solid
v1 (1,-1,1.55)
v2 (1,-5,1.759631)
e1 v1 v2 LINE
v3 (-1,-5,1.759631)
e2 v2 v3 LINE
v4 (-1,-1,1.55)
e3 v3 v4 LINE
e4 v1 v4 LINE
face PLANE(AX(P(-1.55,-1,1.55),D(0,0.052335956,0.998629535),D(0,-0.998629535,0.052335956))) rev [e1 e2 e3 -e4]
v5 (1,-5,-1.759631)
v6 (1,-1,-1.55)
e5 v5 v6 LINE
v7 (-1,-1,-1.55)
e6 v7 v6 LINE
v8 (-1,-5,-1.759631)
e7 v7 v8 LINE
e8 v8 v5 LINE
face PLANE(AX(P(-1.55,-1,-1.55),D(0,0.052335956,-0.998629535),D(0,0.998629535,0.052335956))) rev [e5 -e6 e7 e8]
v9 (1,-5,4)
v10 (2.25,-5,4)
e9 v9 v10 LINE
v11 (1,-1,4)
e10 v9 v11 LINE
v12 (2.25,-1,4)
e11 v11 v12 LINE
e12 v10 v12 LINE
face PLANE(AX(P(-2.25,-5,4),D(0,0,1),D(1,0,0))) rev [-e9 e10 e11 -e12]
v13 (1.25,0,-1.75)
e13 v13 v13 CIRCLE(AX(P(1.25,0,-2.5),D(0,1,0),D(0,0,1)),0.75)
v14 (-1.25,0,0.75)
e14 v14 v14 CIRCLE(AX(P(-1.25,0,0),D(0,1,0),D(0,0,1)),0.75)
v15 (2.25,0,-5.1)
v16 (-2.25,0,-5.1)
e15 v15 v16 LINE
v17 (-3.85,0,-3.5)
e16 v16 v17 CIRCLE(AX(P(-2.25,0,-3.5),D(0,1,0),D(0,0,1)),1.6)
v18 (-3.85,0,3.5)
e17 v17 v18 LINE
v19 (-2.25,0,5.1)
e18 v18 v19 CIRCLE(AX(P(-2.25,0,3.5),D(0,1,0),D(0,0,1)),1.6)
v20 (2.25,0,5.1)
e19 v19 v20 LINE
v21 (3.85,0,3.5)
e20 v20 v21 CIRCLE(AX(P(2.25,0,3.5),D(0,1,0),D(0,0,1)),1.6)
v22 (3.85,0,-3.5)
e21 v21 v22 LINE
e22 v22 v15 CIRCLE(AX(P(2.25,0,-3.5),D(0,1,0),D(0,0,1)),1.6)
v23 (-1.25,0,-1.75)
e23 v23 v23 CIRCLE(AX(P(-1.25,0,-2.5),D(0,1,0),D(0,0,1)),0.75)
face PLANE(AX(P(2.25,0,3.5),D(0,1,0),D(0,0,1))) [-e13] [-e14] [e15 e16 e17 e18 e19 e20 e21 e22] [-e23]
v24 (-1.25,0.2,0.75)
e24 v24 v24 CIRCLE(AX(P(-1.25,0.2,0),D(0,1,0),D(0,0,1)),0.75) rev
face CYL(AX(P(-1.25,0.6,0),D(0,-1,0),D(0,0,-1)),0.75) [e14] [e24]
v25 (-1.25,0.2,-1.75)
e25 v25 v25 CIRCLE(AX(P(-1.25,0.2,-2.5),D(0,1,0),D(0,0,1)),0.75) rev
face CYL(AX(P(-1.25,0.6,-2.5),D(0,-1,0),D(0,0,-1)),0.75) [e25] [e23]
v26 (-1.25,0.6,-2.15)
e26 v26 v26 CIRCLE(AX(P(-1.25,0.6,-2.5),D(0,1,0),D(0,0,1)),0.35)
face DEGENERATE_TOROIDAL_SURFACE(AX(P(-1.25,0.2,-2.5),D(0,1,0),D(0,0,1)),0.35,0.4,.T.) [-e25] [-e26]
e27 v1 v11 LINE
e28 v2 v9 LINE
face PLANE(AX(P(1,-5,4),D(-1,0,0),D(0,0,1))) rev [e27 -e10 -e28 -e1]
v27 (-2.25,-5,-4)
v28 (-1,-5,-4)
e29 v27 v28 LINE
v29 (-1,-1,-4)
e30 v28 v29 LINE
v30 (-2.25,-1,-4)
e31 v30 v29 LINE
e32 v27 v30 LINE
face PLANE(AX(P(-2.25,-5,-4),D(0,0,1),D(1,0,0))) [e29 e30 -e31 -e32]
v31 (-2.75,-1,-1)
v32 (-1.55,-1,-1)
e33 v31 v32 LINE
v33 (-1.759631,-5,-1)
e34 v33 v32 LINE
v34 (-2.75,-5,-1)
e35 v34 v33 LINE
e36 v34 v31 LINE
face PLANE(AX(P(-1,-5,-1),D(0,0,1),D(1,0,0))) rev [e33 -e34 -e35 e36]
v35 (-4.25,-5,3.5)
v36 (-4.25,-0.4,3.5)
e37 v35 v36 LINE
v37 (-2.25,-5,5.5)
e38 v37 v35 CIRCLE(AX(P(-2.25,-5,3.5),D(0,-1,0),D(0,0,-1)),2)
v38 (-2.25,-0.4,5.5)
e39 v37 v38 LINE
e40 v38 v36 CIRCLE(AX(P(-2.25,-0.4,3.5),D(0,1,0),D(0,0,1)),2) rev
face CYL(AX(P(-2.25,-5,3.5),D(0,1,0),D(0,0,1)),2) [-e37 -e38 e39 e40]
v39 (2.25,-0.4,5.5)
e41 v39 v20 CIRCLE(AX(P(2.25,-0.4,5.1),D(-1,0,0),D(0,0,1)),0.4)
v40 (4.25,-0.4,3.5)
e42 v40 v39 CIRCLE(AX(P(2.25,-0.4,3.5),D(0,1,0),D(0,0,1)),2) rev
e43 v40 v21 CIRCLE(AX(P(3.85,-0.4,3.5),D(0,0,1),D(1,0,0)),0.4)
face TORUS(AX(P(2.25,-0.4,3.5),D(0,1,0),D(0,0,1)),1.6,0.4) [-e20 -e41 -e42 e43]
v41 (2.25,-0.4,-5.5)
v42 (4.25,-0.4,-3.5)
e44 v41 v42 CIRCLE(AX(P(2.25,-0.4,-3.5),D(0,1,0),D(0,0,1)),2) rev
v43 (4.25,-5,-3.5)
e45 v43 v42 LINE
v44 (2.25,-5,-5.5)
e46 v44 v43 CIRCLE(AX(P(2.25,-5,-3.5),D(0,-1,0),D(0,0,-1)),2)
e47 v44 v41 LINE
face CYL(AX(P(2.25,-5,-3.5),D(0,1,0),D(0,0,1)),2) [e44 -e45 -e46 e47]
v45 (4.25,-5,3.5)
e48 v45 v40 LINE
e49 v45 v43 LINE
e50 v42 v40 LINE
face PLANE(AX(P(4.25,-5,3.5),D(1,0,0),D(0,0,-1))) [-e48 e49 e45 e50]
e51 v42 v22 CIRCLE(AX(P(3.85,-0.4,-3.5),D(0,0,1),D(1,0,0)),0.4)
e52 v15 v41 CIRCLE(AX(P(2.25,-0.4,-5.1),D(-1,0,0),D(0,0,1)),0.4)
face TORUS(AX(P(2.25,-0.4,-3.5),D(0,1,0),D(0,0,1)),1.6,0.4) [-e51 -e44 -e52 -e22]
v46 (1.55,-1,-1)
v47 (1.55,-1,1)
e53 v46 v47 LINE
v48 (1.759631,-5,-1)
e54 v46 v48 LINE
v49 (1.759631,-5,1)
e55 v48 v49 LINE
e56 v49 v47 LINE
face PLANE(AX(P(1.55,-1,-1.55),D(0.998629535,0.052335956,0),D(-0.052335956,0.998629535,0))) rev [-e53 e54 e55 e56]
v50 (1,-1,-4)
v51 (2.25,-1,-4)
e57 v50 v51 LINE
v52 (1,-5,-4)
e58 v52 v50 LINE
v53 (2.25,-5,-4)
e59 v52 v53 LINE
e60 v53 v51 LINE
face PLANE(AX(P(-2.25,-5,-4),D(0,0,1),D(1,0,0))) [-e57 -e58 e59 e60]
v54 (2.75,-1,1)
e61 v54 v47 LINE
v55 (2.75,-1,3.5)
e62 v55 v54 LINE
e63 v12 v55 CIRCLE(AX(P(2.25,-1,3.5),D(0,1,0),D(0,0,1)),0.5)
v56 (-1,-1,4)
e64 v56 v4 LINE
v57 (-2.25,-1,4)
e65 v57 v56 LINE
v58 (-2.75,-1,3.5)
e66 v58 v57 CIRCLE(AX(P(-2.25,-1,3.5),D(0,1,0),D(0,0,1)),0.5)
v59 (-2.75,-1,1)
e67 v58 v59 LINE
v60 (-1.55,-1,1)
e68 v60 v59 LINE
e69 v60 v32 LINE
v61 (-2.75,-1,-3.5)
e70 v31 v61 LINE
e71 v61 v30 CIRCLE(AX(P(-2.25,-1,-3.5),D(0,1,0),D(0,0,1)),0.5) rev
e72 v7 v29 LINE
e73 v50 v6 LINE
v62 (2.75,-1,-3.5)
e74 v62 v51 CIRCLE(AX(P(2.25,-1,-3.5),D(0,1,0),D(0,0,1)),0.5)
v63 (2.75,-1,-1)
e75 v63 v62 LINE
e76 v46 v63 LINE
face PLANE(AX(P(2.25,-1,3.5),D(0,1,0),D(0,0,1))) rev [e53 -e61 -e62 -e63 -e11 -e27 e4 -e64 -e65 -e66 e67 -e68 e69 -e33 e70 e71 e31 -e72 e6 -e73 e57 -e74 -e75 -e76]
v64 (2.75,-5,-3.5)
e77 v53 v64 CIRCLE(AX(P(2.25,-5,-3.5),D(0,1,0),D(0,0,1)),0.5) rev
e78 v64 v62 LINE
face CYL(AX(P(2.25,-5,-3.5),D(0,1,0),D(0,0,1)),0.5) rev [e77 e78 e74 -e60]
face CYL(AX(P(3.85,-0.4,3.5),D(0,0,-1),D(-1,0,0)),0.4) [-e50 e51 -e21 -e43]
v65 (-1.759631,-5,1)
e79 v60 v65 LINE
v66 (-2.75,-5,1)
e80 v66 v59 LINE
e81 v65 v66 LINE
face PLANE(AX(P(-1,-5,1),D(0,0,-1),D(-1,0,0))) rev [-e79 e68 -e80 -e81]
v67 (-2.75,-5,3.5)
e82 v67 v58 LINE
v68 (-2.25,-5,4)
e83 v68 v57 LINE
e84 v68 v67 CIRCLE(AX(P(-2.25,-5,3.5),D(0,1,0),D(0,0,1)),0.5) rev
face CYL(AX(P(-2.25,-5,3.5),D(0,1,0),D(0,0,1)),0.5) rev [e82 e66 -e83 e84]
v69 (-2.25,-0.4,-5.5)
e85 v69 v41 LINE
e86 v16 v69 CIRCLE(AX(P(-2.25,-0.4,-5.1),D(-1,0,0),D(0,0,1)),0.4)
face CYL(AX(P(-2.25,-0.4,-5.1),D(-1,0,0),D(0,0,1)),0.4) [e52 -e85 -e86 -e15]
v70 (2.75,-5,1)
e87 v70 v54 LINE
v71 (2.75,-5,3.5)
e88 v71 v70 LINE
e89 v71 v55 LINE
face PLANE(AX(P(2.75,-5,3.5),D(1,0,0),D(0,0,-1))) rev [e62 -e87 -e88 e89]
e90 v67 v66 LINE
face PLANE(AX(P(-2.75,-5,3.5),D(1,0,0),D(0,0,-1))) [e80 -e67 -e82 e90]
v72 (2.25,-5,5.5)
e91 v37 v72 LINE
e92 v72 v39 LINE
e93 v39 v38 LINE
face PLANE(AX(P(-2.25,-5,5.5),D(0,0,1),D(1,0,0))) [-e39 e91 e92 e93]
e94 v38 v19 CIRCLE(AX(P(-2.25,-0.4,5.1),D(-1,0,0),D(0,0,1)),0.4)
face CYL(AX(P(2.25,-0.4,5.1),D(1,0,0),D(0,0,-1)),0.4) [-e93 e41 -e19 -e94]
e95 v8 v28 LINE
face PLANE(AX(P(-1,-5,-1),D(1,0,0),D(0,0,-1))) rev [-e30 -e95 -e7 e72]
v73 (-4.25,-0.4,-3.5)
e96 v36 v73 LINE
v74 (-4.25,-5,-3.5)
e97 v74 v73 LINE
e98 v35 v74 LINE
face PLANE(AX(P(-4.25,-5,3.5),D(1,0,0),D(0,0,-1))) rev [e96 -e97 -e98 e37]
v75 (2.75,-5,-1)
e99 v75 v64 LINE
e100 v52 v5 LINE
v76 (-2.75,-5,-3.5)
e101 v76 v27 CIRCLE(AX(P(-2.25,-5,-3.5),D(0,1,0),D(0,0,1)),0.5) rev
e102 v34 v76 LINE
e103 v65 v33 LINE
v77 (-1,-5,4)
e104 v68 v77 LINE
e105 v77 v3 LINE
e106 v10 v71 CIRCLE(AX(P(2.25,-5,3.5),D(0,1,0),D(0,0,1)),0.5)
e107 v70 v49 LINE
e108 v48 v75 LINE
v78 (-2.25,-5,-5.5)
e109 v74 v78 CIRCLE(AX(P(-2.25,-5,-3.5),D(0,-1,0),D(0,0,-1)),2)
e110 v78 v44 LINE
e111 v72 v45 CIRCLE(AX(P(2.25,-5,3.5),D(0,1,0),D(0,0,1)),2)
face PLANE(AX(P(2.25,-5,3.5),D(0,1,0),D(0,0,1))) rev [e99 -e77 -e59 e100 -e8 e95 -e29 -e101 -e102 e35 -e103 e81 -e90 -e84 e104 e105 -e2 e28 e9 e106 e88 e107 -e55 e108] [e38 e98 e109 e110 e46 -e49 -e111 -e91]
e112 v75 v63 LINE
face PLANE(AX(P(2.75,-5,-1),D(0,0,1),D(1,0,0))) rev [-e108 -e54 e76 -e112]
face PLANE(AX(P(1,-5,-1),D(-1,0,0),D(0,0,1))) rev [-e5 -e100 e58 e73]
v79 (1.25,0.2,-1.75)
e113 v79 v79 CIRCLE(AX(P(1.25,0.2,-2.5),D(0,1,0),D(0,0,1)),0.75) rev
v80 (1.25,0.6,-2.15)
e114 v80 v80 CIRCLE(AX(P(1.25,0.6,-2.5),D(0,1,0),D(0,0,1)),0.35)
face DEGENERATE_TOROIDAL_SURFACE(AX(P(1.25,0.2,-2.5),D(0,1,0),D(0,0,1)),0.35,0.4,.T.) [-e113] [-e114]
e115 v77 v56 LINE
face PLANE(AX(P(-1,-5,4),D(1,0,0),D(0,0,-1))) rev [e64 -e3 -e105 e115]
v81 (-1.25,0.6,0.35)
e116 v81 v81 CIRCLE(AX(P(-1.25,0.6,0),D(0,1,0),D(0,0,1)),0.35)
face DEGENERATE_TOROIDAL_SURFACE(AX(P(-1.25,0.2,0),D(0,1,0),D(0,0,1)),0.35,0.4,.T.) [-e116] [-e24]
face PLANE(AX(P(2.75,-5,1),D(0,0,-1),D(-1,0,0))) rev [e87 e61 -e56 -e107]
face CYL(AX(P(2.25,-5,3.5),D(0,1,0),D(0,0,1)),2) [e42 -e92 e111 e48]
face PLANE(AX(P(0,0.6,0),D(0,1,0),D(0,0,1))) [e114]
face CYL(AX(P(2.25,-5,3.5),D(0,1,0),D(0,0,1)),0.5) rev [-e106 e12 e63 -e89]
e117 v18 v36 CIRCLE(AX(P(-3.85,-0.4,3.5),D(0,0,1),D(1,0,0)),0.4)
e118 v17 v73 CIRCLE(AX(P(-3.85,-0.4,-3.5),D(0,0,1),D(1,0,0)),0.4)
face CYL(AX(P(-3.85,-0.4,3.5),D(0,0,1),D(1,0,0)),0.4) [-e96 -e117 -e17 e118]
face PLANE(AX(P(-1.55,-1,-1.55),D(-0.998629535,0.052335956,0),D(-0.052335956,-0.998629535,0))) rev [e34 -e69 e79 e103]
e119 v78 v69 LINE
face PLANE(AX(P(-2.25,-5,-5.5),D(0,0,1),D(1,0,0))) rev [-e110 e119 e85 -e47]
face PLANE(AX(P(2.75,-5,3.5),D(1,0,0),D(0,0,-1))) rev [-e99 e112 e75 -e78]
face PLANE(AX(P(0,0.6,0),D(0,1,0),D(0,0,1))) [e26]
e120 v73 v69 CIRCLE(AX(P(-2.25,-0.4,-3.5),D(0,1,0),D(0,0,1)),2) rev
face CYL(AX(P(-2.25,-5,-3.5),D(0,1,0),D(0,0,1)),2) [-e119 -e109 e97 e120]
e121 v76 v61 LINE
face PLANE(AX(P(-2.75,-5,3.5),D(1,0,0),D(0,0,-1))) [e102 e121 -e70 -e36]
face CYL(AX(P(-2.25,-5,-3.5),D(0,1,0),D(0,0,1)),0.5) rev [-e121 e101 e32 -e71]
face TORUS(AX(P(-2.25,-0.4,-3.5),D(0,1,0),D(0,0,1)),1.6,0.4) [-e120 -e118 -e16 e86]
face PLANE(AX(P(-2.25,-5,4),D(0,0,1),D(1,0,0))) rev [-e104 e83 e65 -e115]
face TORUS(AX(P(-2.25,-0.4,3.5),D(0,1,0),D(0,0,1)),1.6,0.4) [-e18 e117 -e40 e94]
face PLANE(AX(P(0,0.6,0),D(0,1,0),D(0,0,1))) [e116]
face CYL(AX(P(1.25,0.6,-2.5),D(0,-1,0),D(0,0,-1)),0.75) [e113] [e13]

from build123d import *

# Parameters (mm, degrees)
BOSS_EXTRUDE1_DEPTH = 5
SKETCH1_3_R         = 0.75
BOSS_EXTRUDE2_DEPTH = 0.6
FILLET2_R           = 0.4
SHELL1_START        = -5
SHELL1_DEPTH        = 4
BOSS_EXTRUDE4_DEPTH = 4
SKETCH4_W           = 3.1
SKETCH4_H           = 3.1
CUT_EXTRUDE1_DEPTH  = 9.019507466
CUT_EXTRUDE1_DRAFT  = -3


# Read off the part's stored shape, not the designer's step: Shell1
with BuildPart() as part:
    # Sketch1 → Boss-Extrude1 (new body)
    with BuildSketch(Plane(origin=(0, 0, 0), x_dir=(1, 0, 0), z_dir=(0, 1, 0))):
        with BuildLine():
            Line((-2.25, -5.5), (2.25, -5.5))
            ThreePointArc((2.25, -5.5), (3.664213562, -4.914213562), (4.25, -3.5))
            Line((4.25, -3.5), (4.25, 3.5))
            ThreePointArc((4.25, 3.5), (3.664213562, 4.914213562), (2.25, 5.5))
            Line((2.25, 5.5), (-2.25, 5.5))
            ThreePointArc((-2.25, 5.5), (-3.664213562, 4.914213562), (-4.25, 3.5))
            Line((-4.25, 3.5), (-4.25, -3.5))
            ThreePointArc((-4.25, -3.5), (-3.664213562, -4.914213562), (-2.25, -5.5))
        make_face()
    extrude(amount=-BOSS_EXTRUDE1_DEPTH)

    # Sketch1<3> → Boss-Extrude2 (add)
    with BuildSketch(Plane(origin=(0, 0, 0), x_dir=(1, 0, 0), z_dir=(0, 1, 0))):
        with Locations(Location((1.25, 2.5, 0), (0, 0, 270))):
            Circle(SKETCH1_3_R)
        with Locations(Location((-1.25, 0, 0), (0, 0, 270))):
            Circle(SKETCH1_3_R)
        with Locations(Location((-1.25, 2.5, 0), (0, 0, 270))):
            Circle(SKETCH1_3_R)
    extrude(amount=BOSS_EXTRUDE2_DEPTH)

    # Fillet2
    fillet2_edges = [part.edges().sort_by_distance(p)[0] for p in [
        (3.664213562, 0, -4.914213562),
        (4.25, 0, 0),
        (3.664213562, 0, 4.914213562),
        (0, 0, 5.5),
        (-1.25, 0.6, -3.25),
        (-1.25, 0.6, -0.75),
        (1.25, 0.6, -3.25),
        (-3.664213562, 0, 4.914213562),
        (-4.25, 0, 0),
        (-3.664213562, 0, -4.914213562),
        (0, 0, -5.5),
    ]]
    fillet(fillet2_edges, radius=FILLET2_R)

    # Shell1 outline → Shell1 (cut)
    with BuildSketch(Plane(origin=(0, 0, 0), x_dir=(1, 0, 0), z_dir=(0, 1, 0)).offset(SHELL1_START)):
        with BuildLine():
            ThreePointArc((-2.75, -3.5), (-2.603553391, -3.853553391), (-2.25, -4))
            Line((-2.25, -4), (2.25, -4))
            ThreePointArc((2.25, -4), (2.603553391, -3.853553391), (2.75, -3.5))
            Line((2.75, -3.5), (2.75, 3.5))
            ThreePointArc((2.75, 3.5), (2.603553391, 3.853553391), (2.25, 4))
            Line((2.25, 4), (-2.25, 4))
            ThreePointArc((-2.25, 4), (-2.603553391, 3.853553391), (-2.75, 3.5))
            Line((-2.75, 3.5), (-2.75, -3.5))
        make_face()
    extrude(amount=SHELL1_DEPTH, mode=Mode.SUBTRACT)

    # Sketch3 → Boss-Extrude4 (add)
    with BuildSketch(Plane.XZ.offset(1)):
        Polygon((-1, 4), (1, 4), (1, 1), (2.75, 1), (2.75, -1), (1, -1), (1, -4), (-1, -4), (-1, -1), (-2.75, -1), (-2.75, 1), (-1, 1), align=None)
    extrude(amount=BOSS_EXTRUDE4_DEPTH)


with BuildPart() as cut_extrude1_tool:
    # Sketch4 → Cut-Extrude1 (with draft: the straight prism first)
    with BuildSketch(Plane.XZ.offset(1)):
        Rectangle(SKETCH4_W, SKETCH4_H)
    extrude(amount=CUT_EXTRUDE1_DEPTH)
    # Cut-Extrude1: the draft: its side faces are tilted about the plane it starts from
    cut_extrude1_sides = [cut_extrude1_tool.faces().sort_by_distance(p)[0] for p in [
        (0, -5.509753733, -1.55),
        (1.55, -5.509753733, 0),
        (0, -5.509753733, 1.55),
        (-1.55, -5.509753733, 0),
    ]]
    draft(cut_extrude1_sides, Plane.XZ.offset(1), CUT_EXTRUDE1_DRAFT)


with BuildPart() as part_1:
    add(part.part)

    # Cut-Extrude1: cut by cut_extrude1_tool
    add(cut_extrude1_tool.part, mode=Mode.SUBTRACT)


solid = part_1.part
